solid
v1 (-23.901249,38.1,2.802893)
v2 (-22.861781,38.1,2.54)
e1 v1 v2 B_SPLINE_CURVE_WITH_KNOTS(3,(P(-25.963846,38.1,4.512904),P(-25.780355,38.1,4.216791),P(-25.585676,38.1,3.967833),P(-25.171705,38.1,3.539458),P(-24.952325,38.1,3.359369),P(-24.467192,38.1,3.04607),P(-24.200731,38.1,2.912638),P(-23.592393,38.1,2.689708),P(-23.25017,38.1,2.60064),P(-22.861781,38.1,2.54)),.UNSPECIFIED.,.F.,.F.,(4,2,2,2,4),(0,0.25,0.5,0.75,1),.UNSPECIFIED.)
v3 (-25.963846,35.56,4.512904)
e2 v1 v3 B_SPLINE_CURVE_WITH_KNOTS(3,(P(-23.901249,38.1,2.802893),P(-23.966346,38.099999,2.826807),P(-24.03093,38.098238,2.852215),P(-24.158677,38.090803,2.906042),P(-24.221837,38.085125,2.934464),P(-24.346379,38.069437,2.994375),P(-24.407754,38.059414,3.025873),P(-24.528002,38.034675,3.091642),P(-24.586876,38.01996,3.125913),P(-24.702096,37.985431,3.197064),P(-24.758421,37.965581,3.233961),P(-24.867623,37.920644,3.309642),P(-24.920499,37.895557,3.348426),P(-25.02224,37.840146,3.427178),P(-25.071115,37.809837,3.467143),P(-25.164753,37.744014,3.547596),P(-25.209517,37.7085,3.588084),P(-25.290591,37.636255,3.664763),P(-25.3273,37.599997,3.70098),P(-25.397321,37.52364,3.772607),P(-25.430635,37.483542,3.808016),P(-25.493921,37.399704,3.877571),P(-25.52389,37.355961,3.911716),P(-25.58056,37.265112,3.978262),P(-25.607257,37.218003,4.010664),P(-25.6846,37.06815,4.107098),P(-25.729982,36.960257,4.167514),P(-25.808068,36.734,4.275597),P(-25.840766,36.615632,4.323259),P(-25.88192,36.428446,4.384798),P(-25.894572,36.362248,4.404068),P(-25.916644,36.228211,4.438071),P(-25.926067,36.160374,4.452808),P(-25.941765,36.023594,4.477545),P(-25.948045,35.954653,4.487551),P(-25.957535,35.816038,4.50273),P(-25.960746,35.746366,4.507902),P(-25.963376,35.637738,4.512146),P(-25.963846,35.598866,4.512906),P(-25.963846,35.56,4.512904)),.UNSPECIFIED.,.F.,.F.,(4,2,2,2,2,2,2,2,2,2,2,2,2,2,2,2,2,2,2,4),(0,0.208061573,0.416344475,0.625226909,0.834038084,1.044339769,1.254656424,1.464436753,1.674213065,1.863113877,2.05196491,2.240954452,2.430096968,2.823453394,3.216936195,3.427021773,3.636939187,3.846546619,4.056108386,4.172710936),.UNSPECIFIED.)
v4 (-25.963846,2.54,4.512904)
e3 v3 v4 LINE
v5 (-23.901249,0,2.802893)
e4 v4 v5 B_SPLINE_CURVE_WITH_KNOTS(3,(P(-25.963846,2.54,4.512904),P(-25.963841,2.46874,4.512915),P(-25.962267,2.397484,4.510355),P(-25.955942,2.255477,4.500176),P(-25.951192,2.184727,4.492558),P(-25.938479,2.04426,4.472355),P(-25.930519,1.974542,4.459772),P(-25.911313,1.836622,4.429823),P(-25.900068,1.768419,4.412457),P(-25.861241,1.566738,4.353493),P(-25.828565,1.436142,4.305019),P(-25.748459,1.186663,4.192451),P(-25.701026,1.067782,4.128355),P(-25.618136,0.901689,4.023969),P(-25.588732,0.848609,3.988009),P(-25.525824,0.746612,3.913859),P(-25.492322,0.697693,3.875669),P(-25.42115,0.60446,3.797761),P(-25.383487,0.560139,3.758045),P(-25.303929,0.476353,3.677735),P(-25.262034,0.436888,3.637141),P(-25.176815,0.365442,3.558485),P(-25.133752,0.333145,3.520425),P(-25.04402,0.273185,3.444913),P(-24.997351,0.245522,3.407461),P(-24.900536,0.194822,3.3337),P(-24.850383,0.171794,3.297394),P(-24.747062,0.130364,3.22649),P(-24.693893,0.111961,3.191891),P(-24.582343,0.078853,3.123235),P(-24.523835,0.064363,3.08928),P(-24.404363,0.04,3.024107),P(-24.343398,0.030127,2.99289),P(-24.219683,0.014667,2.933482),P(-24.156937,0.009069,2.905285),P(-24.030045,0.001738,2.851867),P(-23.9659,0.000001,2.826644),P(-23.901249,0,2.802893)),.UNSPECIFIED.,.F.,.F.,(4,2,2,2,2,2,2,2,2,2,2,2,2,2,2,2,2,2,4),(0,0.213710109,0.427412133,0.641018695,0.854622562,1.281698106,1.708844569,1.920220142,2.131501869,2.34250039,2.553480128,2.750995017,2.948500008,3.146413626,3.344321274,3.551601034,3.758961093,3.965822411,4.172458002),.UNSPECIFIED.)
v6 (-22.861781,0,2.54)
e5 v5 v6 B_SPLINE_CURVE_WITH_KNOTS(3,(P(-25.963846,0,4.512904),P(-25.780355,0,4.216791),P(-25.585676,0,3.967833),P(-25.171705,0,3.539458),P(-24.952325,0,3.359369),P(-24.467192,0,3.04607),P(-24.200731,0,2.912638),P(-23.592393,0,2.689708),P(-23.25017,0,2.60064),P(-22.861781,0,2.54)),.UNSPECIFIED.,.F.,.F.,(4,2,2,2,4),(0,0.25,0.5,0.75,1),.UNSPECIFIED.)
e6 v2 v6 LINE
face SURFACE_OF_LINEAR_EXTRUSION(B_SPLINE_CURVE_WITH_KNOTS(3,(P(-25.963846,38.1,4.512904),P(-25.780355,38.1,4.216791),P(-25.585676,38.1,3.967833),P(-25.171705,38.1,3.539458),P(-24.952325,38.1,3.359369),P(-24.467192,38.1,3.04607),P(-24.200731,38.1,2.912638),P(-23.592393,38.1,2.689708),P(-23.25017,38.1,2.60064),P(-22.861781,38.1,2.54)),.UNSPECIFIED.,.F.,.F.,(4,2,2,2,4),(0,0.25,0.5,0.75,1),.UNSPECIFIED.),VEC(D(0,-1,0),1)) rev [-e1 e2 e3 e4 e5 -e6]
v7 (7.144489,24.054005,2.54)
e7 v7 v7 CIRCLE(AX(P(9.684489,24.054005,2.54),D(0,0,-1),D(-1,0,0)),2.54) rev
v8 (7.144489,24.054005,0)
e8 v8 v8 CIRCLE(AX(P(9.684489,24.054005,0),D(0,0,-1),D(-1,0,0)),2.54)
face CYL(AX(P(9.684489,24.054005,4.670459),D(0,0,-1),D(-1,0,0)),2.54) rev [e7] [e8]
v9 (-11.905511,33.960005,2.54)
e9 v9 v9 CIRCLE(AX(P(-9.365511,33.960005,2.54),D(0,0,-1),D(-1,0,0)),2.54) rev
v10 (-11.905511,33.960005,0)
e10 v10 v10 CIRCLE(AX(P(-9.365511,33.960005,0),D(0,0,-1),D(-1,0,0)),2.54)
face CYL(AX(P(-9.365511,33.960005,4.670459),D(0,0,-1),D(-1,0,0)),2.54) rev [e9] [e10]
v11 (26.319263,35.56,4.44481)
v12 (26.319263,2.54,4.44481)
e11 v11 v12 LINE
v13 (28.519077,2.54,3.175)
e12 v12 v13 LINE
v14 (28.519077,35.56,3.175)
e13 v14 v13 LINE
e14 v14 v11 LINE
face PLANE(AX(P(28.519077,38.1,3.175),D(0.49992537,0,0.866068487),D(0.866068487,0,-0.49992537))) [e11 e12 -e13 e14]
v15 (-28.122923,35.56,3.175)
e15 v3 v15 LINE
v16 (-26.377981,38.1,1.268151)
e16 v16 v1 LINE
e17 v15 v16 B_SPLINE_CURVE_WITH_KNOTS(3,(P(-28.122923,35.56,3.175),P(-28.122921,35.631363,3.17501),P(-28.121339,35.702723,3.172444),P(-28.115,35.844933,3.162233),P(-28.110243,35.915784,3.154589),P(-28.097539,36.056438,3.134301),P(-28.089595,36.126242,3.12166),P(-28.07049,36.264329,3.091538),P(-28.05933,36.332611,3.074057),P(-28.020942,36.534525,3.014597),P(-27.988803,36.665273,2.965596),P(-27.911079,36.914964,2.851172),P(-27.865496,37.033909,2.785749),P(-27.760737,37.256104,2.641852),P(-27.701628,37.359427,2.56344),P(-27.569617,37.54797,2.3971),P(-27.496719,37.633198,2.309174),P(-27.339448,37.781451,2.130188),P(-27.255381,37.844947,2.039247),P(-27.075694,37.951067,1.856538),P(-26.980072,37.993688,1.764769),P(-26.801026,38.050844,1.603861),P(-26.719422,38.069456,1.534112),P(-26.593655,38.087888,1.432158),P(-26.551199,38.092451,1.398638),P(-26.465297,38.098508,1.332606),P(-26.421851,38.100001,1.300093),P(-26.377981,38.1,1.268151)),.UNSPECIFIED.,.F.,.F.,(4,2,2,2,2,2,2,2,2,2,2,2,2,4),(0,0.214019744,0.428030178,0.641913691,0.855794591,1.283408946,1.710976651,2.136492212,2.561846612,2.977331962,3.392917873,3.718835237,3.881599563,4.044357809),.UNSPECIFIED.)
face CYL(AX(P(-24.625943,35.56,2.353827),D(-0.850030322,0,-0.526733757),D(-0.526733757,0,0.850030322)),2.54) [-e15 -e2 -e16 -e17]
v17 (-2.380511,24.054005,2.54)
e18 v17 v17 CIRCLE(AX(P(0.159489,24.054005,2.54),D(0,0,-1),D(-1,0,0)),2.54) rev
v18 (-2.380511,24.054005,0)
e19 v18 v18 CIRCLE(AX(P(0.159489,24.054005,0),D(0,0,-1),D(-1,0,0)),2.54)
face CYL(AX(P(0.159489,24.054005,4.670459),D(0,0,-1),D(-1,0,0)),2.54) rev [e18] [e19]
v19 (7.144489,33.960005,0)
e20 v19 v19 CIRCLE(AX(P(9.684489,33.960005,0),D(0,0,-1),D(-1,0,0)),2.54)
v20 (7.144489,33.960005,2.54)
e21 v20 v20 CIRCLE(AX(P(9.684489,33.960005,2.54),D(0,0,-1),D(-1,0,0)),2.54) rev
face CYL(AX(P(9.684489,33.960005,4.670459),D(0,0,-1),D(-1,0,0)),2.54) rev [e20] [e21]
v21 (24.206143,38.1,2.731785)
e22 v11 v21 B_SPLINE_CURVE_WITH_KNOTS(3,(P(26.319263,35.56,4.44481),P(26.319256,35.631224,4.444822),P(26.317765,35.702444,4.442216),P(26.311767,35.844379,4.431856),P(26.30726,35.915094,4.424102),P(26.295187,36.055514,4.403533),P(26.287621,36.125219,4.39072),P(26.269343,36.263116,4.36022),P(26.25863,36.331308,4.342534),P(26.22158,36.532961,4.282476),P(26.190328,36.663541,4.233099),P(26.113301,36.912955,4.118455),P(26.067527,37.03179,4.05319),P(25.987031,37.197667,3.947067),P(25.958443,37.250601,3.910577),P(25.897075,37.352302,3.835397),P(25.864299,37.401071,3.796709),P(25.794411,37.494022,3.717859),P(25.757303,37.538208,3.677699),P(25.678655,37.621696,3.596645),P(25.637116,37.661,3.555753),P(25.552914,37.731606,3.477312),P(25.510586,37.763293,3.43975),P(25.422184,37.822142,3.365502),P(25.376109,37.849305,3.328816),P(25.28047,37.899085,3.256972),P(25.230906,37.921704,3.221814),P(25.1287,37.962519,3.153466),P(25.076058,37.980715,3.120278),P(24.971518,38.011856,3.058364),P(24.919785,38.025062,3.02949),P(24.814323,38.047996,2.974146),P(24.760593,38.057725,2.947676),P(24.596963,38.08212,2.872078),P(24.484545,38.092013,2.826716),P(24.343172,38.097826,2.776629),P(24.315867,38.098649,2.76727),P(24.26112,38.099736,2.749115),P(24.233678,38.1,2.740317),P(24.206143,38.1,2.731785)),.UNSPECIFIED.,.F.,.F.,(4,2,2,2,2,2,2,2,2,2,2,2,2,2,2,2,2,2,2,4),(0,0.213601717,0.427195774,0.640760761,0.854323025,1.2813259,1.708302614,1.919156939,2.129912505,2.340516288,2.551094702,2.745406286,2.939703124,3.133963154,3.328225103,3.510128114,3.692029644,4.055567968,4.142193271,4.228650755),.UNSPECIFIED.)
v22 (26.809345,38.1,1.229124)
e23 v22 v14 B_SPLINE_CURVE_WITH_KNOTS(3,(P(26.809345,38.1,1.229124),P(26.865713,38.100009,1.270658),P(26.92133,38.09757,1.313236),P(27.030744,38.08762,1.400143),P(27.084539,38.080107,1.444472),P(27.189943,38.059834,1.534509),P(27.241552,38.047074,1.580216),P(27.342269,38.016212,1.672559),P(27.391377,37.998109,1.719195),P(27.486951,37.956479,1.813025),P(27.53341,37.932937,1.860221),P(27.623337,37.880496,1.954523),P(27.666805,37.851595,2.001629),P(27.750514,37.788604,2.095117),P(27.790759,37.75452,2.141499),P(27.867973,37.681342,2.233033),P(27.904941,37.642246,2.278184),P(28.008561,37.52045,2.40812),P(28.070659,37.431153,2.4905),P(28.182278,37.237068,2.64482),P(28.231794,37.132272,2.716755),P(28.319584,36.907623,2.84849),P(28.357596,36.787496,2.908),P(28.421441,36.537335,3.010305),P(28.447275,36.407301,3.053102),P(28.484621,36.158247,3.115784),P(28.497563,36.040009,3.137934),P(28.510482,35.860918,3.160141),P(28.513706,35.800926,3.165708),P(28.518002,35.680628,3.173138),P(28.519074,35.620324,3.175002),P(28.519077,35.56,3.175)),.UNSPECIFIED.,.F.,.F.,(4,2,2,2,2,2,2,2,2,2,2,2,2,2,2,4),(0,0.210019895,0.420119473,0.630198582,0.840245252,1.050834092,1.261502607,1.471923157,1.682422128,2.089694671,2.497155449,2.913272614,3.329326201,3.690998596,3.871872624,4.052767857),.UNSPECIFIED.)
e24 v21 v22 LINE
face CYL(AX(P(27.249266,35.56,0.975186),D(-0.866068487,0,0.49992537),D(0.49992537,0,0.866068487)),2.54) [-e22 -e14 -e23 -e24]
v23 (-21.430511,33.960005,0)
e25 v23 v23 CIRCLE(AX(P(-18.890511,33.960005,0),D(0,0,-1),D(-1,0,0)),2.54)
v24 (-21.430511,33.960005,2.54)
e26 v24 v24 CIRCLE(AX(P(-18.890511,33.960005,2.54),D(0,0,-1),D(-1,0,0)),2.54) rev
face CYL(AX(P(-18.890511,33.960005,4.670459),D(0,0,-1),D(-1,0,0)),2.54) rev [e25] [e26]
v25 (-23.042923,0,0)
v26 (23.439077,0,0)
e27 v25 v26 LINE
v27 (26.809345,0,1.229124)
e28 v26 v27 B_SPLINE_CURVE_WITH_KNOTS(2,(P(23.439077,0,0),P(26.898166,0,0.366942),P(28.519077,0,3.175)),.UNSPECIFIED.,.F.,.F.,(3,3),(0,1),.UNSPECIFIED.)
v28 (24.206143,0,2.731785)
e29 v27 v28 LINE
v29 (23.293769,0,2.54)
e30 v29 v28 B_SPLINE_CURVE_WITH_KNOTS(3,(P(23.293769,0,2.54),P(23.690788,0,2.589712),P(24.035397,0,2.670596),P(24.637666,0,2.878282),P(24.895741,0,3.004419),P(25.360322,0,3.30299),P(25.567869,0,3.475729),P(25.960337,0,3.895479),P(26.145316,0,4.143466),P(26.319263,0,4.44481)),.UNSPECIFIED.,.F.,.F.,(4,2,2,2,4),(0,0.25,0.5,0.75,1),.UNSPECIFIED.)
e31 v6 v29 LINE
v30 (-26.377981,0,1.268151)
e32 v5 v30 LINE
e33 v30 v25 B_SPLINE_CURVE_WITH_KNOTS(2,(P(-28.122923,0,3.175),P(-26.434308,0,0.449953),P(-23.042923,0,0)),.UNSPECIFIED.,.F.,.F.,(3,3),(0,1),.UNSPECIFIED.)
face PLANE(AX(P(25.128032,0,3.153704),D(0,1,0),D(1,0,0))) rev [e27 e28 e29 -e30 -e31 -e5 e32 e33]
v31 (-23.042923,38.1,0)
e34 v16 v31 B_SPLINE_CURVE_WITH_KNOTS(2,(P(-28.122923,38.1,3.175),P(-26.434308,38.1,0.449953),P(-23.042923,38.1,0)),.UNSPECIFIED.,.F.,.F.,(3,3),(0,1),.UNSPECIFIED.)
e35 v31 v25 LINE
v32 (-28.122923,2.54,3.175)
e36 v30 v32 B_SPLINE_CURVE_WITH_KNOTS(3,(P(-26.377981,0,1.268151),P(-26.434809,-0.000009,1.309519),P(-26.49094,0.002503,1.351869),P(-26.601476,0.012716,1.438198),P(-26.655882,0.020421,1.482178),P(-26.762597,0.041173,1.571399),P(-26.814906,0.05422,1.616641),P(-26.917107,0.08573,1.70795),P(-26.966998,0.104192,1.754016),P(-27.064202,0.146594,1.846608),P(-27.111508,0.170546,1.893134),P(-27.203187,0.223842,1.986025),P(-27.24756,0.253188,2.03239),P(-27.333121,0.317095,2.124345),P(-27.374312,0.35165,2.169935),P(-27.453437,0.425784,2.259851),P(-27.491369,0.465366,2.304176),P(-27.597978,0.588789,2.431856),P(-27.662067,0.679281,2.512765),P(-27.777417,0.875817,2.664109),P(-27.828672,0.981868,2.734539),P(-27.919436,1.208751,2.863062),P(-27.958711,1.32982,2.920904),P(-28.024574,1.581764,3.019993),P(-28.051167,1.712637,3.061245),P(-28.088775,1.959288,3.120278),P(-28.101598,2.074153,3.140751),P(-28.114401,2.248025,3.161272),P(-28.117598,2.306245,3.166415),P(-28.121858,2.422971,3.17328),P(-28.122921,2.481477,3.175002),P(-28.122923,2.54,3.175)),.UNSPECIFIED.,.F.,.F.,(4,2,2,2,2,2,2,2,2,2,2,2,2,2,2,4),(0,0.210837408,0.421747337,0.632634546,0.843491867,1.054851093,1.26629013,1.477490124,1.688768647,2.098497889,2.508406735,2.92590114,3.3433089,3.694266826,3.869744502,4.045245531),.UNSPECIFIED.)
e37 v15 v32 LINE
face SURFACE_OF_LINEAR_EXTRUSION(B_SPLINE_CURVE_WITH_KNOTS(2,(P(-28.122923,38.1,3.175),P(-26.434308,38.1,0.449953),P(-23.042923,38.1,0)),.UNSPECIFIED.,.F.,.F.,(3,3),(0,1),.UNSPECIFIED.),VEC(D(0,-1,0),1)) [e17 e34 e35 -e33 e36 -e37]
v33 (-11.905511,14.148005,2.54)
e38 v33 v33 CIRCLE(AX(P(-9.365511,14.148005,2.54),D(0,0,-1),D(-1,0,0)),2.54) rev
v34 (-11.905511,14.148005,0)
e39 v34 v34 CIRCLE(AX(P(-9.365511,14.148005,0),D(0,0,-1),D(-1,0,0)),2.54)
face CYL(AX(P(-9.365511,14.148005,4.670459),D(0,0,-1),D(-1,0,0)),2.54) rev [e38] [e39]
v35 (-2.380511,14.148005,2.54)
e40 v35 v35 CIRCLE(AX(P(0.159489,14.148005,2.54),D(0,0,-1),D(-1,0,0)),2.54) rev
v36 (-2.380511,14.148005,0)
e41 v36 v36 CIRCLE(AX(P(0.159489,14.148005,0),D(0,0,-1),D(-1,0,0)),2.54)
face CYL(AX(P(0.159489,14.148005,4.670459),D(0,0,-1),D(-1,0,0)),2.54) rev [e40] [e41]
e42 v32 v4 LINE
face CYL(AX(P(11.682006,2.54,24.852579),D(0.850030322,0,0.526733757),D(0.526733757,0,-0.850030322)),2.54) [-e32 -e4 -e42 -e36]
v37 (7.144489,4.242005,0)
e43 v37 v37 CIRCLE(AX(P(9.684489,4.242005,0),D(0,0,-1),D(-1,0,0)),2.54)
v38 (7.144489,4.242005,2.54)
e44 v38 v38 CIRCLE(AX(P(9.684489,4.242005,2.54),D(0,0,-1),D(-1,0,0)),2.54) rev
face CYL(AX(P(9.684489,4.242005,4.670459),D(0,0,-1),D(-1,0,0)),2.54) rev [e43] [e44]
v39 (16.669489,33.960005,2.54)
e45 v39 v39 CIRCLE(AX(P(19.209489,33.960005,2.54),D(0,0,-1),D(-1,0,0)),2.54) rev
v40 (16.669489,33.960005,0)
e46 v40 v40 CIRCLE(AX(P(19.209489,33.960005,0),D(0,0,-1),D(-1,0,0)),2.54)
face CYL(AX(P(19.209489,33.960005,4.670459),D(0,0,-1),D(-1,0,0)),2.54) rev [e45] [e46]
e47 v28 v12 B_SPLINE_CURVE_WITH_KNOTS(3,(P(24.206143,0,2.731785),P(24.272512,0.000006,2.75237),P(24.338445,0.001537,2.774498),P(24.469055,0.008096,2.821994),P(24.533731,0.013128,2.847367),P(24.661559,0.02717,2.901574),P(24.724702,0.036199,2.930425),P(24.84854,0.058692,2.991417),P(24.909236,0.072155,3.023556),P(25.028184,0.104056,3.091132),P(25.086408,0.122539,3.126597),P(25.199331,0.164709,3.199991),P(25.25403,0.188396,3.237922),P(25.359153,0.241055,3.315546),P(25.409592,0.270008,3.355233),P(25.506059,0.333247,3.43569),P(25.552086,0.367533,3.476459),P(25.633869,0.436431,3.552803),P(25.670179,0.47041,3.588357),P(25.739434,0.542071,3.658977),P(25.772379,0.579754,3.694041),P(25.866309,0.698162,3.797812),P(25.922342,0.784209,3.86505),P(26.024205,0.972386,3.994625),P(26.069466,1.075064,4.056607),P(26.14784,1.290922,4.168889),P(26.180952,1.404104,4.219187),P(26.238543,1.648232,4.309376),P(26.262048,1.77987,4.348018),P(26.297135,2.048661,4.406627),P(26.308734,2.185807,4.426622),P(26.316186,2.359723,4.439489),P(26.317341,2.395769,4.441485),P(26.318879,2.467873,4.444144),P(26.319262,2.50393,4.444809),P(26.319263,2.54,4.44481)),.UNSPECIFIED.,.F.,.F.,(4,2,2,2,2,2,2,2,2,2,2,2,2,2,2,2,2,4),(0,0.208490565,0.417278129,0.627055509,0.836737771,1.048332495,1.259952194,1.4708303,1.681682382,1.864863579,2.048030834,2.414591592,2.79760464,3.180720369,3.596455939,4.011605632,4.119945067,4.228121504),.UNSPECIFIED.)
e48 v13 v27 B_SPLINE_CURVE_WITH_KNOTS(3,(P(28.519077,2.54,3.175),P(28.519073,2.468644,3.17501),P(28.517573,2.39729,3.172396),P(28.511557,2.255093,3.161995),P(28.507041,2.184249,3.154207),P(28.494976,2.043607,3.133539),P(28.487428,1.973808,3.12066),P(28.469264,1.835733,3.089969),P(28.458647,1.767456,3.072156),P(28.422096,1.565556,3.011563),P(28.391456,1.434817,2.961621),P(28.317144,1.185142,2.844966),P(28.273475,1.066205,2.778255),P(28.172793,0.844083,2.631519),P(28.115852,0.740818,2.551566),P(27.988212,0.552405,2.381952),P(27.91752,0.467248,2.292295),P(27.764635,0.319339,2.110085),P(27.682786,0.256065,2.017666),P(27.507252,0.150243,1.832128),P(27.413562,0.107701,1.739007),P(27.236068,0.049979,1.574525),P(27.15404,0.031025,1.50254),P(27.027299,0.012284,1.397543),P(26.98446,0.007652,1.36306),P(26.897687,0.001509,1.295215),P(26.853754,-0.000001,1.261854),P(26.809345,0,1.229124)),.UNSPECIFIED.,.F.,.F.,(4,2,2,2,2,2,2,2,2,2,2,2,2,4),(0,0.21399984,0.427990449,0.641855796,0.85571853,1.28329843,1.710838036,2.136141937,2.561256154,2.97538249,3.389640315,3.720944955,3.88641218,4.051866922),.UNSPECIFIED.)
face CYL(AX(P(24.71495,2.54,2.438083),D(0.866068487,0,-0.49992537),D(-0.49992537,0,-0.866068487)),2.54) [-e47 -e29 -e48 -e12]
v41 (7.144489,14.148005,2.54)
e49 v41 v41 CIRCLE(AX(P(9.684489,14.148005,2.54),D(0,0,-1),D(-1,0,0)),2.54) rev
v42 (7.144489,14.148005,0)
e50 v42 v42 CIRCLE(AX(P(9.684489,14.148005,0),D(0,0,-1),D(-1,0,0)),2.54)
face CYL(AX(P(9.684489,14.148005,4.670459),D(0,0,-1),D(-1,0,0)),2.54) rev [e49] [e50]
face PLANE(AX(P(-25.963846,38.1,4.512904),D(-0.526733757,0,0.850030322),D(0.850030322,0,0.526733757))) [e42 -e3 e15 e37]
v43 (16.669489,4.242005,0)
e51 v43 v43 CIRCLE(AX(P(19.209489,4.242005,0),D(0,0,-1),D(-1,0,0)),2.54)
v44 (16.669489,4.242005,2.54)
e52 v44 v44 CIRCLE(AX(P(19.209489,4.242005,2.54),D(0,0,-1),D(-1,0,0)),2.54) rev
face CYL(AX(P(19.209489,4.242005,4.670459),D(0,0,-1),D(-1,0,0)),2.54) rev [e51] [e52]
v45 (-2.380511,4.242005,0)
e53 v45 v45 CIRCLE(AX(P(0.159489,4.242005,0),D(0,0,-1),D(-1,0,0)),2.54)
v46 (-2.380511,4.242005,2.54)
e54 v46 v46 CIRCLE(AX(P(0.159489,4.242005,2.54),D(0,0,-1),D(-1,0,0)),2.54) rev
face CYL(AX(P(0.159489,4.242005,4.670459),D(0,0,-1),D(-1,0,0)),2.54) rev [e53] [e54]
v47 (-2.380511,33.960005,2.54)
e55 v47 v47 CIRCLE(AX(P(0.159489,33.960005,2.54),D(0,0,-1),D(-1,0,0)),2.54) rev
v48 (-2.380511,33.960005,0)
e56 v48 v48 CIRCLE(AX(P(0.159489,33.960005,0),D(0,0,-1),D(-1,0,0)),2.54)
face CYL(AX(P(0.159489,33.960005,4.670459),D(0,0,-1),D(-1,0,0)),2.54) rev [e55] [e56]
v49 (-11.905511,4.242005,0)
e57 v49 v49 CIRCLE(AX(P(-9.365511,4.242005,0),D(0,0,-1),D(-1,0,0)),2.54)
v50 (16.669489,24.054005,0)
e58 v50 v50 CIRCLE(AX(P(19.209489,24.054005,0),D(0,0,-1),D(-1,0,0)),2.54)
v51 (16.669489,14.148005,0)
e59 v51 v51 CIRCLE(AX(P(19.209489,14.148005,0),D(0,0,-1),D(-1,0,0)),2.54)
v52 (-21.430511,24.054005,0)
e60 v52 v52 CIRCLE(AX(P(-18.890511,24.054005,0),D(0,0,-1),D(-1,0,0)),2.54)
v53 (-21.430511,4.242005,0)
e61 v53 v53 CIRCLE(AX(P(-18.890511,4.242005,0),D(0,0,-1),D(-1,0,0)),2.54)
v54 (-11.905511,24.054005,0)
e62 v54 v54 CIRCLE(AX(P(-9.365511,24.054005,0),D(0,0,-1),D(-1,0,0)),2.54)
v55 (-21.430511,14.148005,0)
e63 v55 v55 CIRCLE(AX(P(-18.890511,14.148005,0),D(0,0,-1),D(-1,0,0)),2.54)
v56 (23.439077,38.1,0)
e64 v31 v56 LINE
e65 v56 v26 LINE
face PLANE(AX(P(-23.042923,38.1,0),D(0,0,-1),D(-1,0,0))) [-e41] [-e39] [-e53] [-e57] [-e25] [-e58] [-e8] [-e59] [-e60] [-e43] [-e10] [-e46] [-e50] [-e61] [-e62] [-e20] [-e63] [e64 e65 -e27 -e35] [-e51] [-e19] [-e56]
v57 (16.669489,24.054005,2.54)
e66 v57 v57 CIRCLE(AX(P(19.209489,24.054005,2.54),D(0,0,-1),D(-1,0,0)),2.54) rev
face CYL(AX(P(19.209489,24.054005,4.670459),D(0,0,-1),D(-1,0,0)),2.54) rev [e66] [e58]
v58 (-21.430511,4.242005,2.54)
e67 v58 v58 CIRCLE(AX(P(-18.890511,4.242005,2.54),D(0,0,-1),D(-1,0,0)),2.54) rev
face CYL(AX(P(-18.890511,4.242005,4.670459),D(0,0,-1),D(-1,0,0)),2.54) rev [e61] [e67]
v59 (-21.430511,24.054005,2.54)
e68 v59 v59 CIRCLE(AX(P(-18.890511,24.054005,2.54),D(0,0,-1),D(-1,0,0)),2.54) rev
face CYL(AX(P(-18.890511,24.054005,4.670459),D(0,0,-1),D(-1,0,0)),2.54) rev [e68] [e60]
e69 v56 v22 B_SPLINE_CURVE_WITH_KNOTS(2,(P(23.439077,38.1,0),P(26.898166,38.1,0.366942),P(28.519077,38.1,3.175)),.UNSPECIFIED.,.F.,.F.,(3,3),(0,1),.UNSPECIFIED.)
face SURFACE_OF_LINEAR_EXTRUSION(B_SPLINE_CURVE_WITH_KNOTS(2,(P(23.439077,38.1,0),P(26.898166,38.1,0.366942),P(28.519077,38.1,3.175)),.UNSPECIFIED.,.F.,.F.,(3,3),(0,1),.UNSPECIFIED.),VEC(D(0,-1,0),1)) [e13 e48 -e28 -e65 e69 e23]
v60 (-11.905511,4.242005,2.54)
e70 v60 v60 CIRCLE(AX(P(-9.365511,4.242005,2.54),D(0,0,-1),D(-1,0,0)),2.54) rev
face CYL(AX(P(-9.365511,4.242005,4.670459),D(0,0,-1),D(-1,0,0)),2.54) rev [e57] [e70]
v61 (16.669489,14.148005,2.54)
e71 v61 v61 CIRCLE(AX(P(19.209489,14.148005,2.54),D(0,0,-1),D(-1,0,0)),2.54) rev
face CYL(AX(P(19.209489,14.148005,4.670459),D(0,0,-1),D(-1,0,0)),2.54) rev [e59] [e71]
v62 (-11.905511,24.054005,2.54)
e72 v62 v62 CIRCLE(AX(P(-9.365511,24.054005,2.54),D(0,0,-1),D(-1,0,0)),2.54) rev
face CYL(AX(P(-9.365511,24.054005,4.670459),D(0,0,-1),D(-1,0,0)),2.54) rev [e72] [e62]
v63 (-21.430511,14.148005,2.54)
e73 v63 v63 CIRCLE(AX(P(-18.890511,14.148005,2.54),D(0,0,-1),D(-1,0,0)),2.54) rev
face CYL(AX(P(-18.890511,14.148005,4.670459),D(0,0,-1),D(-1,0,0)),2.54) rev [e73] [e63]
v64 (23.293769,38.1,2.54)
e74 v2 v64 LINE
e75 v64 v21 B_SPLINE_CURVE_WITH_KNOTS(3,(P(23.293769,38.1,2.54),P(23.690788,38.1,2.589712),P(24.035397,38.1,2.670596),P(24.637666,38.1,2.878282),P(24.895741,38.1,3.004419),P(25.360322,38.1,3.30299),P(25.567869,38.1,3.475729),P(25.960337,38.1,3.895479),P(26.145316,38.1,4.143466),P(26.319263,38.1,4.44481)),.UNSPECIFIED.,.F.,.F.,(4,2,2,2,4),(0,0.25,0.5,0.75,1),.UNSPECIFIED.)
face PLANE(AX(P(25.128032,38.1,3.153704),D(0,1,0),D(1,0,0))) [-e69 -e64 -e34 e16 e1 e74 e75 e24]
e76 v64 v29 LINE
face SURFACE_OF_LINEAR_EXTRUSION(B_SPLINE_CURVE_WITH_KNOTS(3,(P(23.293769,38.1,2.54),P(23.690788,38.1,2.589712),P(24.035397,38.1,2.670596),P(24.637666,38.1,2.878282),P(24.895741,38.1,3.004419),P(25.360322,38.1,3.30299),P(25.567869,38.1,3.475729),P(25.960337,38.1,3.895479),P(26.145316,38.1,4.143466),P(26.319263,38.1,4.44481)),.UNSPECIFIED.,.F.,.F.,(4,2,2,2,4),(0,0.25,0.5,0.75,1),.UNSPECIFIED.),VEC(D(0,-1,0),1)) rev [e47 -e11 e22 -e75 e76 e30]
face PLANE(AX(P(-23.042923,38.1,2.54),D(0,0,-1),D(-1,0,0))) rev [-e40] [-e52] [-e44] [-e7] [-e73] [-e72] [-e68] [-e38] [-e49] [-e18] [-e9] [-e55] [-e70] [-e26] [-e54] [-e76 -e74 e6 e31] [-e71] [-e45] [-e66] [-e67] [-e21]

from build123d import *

# Parameters (mm, degrees)
EXTRUDE_THIN1_DEPTH  = 38.1
FILLET4_R            = 2.54
CUT_EXTRUDE1_REACH   = 49.805
SKETCH2_R            = 2.54
LPATTERN1_COUNT      = 5
LPATTERN1_PITCH      = 9.525
LPATTERN1_COUNT_DIR2 = 4
LPATTERN1_PITCH_DIR2 = 9.906


# Read off the part's stored shape, not the designer's step: Extrude-Thin1
with BuildPart() as part:
    # Extrude-Thin1 outline → Extrude-Thin1 (new body)
    with BuildSketch(Plane(origin=(0, 0, 0), x_dir=(1, 0, 0), z_dir=(0, 1, 0))):
        with BuildLine():
            Line((-22.861781044, -2.54), (23.293769416, -2.54))
            add(Edge.make_bspline(
                [(23.293769416, -2.54), (23.690788447, -2.589711931), (24.035397246, -2.670596213), (24.637666039, -2.878281595), (24.89574137, -3.004419147), (25.360322074, -3.302989633), (25.56786948, -3.475729285), (25.960337052, -3.895478718), (26.145315815, -4.143465548), (26.319262748, -4.44481044)],
                knots=[0, 0, 0, 0, 0.25, 0.25, 0.5, 0.5, 0.75, 0.75, 1, 1, 1, 1], degree=3))
            Line((26.319262748, -4.44481044), (28.519076705, -3.175))
            add(Edge.make_bspline(
                [(23.439076705, 0), (26.898166275, -0.366941984), (28.519076705, -3.175)],
                knots=[0, 0, 0, 1, 1, 1], degree=2))
            Line((23.439076705, 0), (-23.042923295, 0))
            add(Edge.make_bspline(
                [(-28.122923295, -3.175), (-26.434307868, -0.449952866), (-23.042923295, 0)],
                knots=[0, 0, 0, 1, 1, 1], degree=2))
            Line((-28.122923295, -3.175), (-25.963846277, -4.512903744))
            add(Edge.make_bspline(
                [(-25.963846277, -4.512903744), (-25.780355431, -4.216790612), (-25.585675804, -3.967832958), (-25.171704683, -3.539458263), (-24.952325189, -3.359368522), (-24.467192442, -3.046070455), (-24.200731304, -2.912638022), (-23.592393193, -2.689707924), (-23.250169649, -2.600640103), (-22.861781044, -2.54)],
                knots=[0, 0, 0, 0, 0.25, 0.25, 0.5, 0.5, 0.75, 0.75, 1, 1, 1, 1], degree=3))
        make_face()
    extrude(amount=EXTRUDE_THIN1_DEPTH)

    # Fillet4
    fillet4_edges = [part.edges().sort_by_distance(p)[0] for p in [
        (27.419169727, 38.1, 3.80990522),
        (27.419169727, 0, 3.80990522),
        (-27.043384786, 0, 3.843951872),
        (-27.043384786, 38.1, 3.843951872),
    ]]
    fillet(fillet4_edges, radius=FILLET4_R)

    # Sketch2 → Cut-Extrude1 (cut, up to next)
    with BuildSketch(Plane(origin=(0, 0, 0), x_dir=(-1, 0, 0), z_dir=(0, 0, -1)), mode=Mode.PRIVATE) as cut_extrude1_sk1:
        with Locations((18.890510813, 33.960005412)):
            Circle(SKETCH2_R)
    cut_extrude1_tool1 = extrude(cut_extrude1_sk1.sketch, amount=-CUT_EXTRUDE1_REACH, mode=Mode.PRIVATE) & part.part
    cut_extrude1 = cut_extrude1_tool1.solids().sort_by_distance((-18.890511, 33.960005, 0))[0]
    add(cut_extrude1, mode=Mode.SUBTRACT)

    # LPattern1: Cut-Extrude1 5 × 4
    with Locations(*[(i * LPATTERN1_PITCH, -j * LPATTERN1_PITCH_DIR2, 0) for i in range(LPATTERN1_COUNT) for j in range(LPATTERN1_COUNT_DIR2) if (i, j) != (0, 0)]):
        add(cut_extrude1, mode=Mode.SUBTRACT)


solid = part.part
